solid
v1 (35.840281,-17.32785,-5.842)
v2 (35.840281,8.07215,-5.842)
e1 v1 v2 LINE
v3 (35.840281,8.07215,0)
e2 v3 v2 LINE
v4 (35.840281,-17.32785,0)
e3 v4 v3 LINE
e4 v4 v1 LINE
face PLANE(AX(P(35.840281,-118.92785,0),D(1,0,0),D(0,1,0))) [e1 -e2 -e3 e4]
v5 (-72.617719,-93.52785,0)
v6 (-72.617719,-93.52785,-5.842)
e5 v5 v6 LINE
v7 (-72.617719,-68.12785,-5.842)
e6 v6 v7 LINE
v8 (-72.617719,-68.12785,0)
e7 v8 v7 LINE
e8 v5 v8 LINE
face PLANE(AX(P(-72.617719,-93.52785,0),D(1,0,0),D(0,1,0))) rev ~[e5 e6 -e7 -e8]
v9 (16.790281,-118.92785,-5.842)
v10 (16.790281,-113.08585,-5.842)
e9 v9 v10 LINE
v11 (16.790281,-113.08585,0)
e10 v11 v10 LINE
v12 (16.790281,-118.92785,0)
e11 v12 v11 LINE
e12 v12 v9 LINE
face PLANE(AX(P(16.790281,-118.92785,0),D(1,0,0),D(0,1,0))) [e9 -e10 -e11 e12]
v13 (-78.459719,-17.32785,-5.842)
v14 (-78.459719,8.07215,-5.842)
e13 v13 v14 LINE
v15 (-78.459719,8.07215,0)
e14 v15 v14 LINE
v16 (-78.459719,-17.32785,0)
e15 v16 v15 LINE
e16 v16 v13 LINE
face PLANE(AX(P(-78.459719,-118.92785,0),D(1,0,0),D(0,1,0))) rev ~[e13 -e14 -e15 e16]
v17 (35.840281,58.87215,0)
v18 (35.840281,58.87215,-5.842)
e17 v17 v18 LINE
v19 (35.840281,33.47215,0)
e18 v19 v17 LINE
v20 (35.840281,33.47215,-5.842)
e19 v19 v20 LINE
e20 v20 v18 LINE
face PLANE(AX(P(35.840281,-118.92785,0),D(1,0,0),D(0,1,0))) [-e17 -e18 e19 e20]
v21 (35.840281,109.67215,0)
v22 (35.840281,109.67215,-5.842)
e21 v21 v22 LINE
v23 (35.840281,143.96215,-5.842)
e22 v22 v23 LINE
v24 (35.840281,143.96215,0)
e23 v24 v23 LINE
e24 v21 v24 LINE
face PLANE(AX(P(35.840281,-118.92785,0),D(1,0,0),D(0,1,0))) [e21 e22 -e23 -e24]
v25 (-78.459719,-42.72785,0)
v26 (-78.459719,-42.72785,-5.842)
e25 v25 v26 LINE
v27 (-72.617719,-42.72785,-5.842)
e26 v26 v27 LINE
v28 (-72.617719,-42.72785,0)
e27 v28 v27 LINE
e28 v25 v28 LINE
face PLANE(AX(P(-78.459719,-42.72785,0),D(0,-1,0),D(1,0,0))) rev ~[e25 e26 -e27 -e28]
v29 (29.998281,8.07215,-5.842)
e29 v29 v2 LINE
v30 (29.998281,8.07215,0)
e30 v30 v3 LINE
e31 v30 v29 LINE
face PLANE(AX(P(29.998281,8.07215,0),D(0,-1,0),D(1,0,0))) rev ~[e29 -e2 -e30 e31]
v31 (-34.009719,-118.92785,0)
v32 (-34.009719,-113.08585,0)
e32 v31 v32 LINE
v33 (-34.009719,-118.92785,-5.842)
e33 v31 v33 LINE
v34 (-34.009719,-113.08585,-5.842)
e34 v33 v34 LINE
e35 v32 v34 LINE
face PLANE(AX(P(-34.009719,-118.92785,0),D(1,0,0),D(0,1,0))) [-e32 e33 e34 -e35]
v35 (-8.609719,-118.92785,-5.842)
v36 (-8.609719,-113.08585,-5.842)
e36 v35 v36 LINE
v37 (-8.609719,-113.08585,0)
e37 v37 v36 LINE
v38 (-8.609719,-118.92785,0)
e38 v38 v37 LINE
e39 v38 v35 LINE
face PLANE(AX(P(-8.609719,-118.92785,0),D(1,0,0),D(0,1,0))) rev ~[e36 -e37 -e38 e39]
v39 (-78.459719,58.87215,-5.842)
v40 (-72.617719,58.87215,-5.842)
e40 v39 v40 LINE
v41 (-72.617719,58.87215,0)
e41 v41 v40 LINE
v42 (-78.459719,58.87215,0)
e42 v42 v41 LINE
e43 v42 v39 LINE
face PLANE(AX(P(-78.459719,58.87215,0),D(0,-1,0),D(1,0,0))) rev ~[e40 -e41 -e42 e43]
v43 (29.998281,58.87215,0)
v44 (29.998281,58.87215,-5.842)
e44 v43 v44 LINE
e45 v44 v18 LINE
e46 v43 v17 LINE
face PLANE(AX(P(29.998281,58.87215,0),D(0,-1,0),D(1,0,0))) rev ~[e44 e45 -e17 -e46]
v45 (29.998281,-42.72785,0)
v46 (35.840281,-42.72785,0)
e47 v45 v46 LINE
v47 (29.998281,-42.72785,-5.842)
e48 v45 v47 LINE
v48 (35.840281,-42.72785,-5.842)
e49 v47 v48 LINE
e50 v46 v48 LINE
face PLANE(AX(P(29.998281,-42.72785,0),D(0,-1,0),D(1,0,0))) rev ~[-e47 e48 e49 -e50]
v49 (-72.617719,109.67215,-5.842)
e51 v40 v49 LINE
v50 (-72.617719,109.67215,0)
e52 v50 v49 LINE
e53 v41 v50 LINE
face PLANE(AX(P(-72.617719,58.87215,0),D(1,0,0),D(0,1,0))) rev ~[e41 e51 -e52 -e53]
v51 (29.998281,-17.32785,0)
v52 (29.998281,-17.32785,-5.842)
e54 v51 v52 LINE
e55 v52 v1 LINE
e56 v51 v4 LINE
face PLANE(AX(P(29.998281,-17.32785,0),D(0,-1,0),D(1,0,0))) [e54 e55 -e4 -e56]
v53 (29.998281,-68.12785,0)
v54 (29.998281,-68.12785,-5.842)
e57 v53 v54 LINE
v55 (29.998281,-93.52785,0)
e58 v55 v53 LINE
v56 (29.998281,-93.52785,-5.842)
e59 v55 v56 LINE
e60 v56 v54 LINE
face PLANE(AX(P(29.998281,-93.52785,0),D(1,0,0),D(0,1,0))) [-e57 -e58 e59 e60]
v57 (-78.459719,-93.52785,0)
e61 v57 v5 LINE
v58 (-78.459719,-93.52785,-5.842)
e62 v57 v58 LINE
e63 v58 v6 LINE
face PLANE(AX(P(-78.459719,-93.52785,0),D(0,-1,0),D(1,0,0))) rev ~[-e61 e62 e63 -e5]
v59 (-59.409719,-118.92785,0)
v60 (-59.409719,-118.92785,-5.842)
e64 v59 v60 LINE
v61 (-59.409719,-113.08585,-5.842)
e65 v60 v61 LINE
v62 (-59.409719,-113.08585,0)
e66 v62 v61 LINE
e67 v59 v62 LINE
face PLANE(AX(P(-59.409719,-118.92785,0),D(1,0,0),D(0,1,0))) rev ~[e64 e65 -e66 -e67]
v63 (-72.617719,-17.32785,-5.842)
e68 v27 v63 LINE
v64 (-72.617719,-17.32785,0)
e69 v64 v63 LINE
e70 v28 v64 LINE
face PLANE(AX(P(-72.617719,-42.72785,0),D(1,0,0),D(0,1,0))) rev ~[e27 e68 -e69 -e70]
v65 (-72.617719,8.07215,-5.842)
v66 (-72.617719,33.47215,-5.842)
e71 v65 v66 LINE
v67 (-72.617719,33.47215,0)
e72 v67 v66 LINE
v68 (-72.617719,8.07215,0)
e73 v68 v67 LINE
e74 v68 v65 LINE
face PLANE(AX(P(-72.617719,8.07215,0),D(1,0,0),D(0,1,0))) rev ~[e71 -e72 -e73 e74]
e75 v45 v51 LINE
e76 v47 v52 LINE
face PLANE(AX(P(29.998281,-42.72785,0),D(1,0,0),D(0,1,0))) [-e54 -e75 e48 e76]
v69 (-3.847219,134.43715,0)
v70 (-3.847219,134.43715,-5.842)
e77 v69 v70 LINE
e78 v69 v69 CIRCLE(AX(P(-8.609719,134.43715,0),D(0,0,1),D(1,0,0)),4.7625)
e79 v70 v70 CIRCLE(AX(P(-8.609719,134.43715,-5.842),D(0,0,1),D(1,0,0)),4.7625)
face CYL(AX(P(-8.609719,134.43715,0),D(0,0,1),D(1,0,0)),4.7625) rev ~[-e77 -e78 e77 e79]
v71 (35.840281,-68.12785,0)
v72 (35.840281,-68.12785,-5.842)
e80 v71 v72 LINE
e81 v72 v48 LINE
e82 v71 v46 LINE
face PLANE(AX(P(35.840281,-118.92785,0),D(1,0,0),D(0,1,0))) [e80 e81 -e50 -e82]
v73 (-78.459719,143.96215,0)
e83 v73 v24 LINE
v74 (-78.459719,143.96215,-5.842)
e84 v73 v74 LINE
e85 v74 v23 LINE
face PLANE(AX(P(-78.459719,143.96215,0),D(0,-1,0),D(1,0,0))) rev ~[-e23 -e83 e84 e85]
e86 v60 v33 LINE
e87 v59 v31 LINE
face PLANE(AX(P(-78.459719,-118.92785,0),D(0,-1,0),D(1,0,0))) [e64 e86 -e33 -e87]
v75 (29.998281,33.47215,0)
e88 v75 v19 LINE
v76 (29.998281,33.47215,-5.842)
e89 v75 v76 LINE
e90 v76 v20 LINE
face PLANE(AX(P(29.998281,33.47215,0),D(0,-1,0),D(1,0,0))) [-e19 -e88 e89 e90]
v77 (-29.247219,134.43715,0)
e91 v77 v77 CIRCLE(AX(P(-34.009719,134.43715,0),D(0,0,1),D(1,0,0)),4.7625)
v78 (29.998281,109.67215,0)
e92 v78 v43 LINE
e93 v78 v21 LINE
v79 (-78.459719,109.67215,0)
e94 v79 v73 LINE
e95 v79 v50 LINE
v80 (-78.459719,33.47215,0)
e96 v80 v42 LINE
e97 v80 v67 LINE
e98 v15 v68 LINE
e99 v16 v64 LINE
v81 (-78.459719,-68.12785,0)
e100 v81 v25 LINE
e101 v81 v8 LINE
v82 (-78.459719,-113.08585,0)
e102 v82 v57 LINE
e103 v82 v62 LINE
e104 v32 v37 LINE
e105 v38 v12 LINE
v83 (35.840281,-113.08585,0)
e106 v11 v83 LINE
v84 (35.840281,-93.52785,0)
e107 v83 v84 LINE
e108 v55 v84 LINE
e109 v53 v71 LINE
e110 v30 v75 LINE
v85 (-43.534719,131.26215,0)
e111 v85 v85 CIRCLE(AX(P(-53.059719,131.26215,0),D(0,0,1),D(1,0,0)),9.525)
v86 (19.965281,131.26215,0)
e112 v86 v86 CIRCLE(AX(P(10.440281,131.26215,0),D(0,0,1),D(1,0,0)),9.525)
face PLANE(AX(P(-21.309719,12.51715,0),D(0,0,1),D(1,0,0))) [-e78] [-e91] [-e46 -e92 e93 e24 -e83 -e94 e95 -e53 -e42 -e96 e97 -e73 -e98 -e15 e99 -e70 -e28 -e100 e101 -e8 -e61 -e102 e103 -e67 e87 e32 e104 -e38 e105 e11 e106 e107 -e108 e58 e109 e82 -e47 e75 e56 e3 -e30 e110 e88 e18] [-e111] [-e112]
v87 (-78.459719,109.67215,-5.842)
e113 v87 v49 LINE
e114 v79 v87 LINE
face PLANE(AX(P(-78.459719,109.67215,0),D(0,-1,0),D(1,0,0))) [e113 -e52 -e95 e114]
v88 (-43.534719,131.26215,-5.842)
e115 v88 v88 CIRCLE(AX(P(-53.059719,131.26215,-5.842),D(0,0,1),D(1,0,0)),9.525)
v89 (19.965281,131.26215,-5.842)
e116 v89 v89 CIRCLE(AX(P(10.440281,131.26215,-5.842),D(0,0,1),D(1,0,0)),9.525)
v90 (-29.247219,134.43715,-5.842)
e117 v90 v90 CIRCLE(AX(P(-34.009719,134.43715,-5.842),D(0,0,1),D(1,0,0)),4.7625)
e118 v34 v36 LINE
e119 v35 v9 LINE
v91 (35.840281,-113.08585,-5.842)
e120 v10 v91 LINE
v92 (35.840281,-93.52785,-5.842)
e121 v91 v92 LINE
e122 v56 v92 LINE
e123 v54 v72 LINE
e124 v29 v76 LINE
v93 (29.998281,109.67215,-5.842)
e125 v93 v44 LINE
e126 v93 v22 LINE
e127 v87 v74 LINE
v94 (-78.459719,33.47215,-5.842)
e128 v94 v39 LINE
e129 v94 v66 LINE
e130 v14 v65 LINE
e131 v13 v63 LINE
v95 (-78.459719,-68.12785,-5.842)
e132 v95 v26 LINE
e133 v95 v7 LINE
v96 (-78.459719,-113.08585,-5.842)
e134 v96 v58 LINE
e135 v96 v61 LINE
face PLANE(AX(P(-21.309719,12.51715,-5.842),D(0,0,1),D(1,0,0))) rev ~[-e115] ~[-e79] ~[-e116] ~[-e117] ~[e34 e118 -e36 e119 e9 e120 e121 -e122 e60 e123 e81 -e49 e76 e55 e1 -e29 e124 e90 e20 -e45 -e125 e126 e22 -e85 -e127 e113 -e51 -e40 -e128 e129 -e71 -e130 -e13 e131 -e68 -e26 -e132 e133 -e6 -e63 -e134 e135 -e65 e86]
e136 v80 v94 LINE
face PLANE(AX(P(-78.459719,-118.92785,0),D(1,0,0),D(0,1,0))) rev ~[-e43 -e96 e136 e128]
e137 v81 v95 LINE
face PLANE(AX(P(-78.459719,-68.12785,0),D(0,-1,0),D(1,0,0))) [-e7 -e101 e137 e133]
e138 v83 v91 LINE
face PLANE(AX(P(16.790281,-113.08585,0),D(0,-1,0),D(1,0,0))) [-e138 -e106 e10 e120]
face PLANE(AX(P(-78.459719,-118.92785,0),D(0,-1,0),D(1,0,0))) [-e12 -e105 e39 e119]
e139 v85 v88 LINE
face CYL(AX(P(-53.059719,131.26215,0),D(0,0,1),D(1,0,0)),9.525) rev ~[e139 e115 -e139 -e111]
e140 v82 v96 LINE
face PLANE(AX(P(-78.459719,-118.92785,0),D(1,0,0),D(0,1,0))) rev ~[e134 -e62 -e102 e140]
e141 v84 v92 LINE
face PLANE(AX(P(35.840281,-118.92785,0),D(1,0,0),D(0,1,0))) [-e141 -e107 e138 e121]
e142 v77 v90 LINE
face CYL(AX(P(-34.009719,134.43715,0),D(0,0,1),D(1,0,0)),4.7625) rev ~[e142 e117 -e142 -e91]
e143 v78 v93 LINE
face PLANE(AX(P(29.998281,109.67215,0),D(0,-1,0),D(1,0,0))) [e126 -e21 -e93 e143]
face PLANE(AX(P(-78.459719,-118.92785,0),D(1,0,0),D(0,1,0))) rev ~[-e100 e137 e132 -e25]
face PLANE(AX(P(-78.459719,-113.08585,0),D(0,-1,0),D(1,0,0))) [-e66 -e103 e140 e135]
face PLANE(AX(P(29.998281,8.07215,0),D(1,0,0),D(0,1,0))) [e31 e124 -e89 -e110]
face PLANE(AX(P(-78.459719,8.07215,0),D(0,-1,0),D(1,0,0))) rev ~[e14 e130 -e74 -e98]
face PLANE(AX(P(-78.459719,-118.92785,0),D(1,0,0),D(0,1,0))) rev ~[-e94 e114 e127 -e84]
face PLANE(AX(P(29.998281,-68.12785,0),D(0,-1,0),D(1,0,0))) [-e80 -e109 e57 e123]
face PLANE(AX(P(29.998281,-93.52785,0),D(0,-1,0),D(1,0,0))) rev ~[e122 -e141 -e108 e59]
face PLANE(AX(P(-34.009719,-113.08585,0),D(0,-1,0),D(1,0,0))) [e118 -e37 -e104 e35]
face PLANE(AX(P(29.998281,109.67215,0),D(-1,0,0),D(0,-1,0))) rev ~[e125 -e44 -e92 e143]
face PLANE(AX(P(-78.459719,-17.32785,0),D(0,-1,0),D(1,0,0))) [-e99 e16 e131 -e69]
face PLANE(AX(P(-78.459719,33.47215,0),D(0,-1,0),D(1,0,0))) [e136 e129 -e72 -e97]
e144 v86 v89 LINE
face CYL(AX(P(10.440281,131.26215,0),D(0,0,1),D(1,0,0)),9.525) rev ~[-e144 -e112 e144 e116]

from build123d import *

# Parameters (mm, degrees)
F0_W     = 114.3
F0_H     = 262.89
F1_DEPTH = 5.842
F2_W     = 25.4
F2_H     = 5.842
F2_W_2   = 19.05
F2_W_3   = 5.842
F2_H_2   = 25.4
F3_DEPTH = 5.842
F4_R     = 4.7625
F4_R_2   = 9.525
F5_DEPTH = 5.842


# Not quite as in the source:
# - a feature names something its author has since deleted; it is built from what else it names


with BuildPart() as f1:
    # F0 (on Top) → F1 (new body)
    with BuildSketch(Plane.XY):
        with Locations((-21.309719372, 12.5171500933)):
            Rectangle(F0_W, F0_H)
    extrude(amount=-F1_DEPTH)

    # F2 (on face) → F3 (cut, through all)
    with BuildSketch(Plane.XY):
        with Locations((-21.309719372, -116.0068499067)):
            Rectangle(F2_W, F2_H)
        with Locations((-68.934719372, -116.0068499067)):
            Rectangle(F2_W_2, F2_H)
        with Locations((26.315280628, -116.0068499067)):
            Rectangle(F2_W_2, F2_H)
        with Locations((-75.538719372, -80.8278499067)):
            Rectangle(F2_W_3, F2_H_2)
        with Locations((32.919280628, -80.8278499067)):
            Rectangle(F2_W_3, F2_H_2)
        with Locations((32.919280628, -30.0278499067)):
            Rectangle(F2_W_3, F2_H_2)
        with Locations((-75.538719372, -30.0278499067)):
            Rectangle(F2_W_3, F2_H_2)
        with Locations((-75.538719372, 20.7721500933)):
            Rectangle(F2_W_3, F2_H_2)
        with Locations((32.919280628, 20.7721500933)):
            Rectangle(F2_W_3, F2_H_2)
        with Locations((-75.538719372, 71.5721500933)):
            Rectangle(F2_W_3, F2_H_2)
        with Locations((32.919280628, 71.5721500933)):
            Rectangle(F2_W_3, F2_H_2)
        with Locations((-75.538719372, 96.9721500933)):
            Rectangle(F2_W_3, F2_H_2)
        with Locations((32.919280628, 96.9721500933)):
            Rectangle(F2_W_3, F2_H_2)
    extrude(amount=-F3_DEPTH, mode=Mode.SUBTRACT)

    # F4 (on face) → F5 (cut, through all)
    with BuildSketch(Plane.XY):
        with Locations((-34.009719372, 134.4371500933)):
            Circle(F4_R)
        with Locations((-8.609719372, 134.4371500933)):
            Circle(F4_R)
        with Locations((-53.059719372, 131.2621500933)):
            Circle(F4_R_2)
        with Locations((10.440280628, 131.2621500933)):
            Circle(F4_R_2)
    extrude(amount=-F5_DEPTH, mode=Mode.SUBTRACT)


solid = f1.part
